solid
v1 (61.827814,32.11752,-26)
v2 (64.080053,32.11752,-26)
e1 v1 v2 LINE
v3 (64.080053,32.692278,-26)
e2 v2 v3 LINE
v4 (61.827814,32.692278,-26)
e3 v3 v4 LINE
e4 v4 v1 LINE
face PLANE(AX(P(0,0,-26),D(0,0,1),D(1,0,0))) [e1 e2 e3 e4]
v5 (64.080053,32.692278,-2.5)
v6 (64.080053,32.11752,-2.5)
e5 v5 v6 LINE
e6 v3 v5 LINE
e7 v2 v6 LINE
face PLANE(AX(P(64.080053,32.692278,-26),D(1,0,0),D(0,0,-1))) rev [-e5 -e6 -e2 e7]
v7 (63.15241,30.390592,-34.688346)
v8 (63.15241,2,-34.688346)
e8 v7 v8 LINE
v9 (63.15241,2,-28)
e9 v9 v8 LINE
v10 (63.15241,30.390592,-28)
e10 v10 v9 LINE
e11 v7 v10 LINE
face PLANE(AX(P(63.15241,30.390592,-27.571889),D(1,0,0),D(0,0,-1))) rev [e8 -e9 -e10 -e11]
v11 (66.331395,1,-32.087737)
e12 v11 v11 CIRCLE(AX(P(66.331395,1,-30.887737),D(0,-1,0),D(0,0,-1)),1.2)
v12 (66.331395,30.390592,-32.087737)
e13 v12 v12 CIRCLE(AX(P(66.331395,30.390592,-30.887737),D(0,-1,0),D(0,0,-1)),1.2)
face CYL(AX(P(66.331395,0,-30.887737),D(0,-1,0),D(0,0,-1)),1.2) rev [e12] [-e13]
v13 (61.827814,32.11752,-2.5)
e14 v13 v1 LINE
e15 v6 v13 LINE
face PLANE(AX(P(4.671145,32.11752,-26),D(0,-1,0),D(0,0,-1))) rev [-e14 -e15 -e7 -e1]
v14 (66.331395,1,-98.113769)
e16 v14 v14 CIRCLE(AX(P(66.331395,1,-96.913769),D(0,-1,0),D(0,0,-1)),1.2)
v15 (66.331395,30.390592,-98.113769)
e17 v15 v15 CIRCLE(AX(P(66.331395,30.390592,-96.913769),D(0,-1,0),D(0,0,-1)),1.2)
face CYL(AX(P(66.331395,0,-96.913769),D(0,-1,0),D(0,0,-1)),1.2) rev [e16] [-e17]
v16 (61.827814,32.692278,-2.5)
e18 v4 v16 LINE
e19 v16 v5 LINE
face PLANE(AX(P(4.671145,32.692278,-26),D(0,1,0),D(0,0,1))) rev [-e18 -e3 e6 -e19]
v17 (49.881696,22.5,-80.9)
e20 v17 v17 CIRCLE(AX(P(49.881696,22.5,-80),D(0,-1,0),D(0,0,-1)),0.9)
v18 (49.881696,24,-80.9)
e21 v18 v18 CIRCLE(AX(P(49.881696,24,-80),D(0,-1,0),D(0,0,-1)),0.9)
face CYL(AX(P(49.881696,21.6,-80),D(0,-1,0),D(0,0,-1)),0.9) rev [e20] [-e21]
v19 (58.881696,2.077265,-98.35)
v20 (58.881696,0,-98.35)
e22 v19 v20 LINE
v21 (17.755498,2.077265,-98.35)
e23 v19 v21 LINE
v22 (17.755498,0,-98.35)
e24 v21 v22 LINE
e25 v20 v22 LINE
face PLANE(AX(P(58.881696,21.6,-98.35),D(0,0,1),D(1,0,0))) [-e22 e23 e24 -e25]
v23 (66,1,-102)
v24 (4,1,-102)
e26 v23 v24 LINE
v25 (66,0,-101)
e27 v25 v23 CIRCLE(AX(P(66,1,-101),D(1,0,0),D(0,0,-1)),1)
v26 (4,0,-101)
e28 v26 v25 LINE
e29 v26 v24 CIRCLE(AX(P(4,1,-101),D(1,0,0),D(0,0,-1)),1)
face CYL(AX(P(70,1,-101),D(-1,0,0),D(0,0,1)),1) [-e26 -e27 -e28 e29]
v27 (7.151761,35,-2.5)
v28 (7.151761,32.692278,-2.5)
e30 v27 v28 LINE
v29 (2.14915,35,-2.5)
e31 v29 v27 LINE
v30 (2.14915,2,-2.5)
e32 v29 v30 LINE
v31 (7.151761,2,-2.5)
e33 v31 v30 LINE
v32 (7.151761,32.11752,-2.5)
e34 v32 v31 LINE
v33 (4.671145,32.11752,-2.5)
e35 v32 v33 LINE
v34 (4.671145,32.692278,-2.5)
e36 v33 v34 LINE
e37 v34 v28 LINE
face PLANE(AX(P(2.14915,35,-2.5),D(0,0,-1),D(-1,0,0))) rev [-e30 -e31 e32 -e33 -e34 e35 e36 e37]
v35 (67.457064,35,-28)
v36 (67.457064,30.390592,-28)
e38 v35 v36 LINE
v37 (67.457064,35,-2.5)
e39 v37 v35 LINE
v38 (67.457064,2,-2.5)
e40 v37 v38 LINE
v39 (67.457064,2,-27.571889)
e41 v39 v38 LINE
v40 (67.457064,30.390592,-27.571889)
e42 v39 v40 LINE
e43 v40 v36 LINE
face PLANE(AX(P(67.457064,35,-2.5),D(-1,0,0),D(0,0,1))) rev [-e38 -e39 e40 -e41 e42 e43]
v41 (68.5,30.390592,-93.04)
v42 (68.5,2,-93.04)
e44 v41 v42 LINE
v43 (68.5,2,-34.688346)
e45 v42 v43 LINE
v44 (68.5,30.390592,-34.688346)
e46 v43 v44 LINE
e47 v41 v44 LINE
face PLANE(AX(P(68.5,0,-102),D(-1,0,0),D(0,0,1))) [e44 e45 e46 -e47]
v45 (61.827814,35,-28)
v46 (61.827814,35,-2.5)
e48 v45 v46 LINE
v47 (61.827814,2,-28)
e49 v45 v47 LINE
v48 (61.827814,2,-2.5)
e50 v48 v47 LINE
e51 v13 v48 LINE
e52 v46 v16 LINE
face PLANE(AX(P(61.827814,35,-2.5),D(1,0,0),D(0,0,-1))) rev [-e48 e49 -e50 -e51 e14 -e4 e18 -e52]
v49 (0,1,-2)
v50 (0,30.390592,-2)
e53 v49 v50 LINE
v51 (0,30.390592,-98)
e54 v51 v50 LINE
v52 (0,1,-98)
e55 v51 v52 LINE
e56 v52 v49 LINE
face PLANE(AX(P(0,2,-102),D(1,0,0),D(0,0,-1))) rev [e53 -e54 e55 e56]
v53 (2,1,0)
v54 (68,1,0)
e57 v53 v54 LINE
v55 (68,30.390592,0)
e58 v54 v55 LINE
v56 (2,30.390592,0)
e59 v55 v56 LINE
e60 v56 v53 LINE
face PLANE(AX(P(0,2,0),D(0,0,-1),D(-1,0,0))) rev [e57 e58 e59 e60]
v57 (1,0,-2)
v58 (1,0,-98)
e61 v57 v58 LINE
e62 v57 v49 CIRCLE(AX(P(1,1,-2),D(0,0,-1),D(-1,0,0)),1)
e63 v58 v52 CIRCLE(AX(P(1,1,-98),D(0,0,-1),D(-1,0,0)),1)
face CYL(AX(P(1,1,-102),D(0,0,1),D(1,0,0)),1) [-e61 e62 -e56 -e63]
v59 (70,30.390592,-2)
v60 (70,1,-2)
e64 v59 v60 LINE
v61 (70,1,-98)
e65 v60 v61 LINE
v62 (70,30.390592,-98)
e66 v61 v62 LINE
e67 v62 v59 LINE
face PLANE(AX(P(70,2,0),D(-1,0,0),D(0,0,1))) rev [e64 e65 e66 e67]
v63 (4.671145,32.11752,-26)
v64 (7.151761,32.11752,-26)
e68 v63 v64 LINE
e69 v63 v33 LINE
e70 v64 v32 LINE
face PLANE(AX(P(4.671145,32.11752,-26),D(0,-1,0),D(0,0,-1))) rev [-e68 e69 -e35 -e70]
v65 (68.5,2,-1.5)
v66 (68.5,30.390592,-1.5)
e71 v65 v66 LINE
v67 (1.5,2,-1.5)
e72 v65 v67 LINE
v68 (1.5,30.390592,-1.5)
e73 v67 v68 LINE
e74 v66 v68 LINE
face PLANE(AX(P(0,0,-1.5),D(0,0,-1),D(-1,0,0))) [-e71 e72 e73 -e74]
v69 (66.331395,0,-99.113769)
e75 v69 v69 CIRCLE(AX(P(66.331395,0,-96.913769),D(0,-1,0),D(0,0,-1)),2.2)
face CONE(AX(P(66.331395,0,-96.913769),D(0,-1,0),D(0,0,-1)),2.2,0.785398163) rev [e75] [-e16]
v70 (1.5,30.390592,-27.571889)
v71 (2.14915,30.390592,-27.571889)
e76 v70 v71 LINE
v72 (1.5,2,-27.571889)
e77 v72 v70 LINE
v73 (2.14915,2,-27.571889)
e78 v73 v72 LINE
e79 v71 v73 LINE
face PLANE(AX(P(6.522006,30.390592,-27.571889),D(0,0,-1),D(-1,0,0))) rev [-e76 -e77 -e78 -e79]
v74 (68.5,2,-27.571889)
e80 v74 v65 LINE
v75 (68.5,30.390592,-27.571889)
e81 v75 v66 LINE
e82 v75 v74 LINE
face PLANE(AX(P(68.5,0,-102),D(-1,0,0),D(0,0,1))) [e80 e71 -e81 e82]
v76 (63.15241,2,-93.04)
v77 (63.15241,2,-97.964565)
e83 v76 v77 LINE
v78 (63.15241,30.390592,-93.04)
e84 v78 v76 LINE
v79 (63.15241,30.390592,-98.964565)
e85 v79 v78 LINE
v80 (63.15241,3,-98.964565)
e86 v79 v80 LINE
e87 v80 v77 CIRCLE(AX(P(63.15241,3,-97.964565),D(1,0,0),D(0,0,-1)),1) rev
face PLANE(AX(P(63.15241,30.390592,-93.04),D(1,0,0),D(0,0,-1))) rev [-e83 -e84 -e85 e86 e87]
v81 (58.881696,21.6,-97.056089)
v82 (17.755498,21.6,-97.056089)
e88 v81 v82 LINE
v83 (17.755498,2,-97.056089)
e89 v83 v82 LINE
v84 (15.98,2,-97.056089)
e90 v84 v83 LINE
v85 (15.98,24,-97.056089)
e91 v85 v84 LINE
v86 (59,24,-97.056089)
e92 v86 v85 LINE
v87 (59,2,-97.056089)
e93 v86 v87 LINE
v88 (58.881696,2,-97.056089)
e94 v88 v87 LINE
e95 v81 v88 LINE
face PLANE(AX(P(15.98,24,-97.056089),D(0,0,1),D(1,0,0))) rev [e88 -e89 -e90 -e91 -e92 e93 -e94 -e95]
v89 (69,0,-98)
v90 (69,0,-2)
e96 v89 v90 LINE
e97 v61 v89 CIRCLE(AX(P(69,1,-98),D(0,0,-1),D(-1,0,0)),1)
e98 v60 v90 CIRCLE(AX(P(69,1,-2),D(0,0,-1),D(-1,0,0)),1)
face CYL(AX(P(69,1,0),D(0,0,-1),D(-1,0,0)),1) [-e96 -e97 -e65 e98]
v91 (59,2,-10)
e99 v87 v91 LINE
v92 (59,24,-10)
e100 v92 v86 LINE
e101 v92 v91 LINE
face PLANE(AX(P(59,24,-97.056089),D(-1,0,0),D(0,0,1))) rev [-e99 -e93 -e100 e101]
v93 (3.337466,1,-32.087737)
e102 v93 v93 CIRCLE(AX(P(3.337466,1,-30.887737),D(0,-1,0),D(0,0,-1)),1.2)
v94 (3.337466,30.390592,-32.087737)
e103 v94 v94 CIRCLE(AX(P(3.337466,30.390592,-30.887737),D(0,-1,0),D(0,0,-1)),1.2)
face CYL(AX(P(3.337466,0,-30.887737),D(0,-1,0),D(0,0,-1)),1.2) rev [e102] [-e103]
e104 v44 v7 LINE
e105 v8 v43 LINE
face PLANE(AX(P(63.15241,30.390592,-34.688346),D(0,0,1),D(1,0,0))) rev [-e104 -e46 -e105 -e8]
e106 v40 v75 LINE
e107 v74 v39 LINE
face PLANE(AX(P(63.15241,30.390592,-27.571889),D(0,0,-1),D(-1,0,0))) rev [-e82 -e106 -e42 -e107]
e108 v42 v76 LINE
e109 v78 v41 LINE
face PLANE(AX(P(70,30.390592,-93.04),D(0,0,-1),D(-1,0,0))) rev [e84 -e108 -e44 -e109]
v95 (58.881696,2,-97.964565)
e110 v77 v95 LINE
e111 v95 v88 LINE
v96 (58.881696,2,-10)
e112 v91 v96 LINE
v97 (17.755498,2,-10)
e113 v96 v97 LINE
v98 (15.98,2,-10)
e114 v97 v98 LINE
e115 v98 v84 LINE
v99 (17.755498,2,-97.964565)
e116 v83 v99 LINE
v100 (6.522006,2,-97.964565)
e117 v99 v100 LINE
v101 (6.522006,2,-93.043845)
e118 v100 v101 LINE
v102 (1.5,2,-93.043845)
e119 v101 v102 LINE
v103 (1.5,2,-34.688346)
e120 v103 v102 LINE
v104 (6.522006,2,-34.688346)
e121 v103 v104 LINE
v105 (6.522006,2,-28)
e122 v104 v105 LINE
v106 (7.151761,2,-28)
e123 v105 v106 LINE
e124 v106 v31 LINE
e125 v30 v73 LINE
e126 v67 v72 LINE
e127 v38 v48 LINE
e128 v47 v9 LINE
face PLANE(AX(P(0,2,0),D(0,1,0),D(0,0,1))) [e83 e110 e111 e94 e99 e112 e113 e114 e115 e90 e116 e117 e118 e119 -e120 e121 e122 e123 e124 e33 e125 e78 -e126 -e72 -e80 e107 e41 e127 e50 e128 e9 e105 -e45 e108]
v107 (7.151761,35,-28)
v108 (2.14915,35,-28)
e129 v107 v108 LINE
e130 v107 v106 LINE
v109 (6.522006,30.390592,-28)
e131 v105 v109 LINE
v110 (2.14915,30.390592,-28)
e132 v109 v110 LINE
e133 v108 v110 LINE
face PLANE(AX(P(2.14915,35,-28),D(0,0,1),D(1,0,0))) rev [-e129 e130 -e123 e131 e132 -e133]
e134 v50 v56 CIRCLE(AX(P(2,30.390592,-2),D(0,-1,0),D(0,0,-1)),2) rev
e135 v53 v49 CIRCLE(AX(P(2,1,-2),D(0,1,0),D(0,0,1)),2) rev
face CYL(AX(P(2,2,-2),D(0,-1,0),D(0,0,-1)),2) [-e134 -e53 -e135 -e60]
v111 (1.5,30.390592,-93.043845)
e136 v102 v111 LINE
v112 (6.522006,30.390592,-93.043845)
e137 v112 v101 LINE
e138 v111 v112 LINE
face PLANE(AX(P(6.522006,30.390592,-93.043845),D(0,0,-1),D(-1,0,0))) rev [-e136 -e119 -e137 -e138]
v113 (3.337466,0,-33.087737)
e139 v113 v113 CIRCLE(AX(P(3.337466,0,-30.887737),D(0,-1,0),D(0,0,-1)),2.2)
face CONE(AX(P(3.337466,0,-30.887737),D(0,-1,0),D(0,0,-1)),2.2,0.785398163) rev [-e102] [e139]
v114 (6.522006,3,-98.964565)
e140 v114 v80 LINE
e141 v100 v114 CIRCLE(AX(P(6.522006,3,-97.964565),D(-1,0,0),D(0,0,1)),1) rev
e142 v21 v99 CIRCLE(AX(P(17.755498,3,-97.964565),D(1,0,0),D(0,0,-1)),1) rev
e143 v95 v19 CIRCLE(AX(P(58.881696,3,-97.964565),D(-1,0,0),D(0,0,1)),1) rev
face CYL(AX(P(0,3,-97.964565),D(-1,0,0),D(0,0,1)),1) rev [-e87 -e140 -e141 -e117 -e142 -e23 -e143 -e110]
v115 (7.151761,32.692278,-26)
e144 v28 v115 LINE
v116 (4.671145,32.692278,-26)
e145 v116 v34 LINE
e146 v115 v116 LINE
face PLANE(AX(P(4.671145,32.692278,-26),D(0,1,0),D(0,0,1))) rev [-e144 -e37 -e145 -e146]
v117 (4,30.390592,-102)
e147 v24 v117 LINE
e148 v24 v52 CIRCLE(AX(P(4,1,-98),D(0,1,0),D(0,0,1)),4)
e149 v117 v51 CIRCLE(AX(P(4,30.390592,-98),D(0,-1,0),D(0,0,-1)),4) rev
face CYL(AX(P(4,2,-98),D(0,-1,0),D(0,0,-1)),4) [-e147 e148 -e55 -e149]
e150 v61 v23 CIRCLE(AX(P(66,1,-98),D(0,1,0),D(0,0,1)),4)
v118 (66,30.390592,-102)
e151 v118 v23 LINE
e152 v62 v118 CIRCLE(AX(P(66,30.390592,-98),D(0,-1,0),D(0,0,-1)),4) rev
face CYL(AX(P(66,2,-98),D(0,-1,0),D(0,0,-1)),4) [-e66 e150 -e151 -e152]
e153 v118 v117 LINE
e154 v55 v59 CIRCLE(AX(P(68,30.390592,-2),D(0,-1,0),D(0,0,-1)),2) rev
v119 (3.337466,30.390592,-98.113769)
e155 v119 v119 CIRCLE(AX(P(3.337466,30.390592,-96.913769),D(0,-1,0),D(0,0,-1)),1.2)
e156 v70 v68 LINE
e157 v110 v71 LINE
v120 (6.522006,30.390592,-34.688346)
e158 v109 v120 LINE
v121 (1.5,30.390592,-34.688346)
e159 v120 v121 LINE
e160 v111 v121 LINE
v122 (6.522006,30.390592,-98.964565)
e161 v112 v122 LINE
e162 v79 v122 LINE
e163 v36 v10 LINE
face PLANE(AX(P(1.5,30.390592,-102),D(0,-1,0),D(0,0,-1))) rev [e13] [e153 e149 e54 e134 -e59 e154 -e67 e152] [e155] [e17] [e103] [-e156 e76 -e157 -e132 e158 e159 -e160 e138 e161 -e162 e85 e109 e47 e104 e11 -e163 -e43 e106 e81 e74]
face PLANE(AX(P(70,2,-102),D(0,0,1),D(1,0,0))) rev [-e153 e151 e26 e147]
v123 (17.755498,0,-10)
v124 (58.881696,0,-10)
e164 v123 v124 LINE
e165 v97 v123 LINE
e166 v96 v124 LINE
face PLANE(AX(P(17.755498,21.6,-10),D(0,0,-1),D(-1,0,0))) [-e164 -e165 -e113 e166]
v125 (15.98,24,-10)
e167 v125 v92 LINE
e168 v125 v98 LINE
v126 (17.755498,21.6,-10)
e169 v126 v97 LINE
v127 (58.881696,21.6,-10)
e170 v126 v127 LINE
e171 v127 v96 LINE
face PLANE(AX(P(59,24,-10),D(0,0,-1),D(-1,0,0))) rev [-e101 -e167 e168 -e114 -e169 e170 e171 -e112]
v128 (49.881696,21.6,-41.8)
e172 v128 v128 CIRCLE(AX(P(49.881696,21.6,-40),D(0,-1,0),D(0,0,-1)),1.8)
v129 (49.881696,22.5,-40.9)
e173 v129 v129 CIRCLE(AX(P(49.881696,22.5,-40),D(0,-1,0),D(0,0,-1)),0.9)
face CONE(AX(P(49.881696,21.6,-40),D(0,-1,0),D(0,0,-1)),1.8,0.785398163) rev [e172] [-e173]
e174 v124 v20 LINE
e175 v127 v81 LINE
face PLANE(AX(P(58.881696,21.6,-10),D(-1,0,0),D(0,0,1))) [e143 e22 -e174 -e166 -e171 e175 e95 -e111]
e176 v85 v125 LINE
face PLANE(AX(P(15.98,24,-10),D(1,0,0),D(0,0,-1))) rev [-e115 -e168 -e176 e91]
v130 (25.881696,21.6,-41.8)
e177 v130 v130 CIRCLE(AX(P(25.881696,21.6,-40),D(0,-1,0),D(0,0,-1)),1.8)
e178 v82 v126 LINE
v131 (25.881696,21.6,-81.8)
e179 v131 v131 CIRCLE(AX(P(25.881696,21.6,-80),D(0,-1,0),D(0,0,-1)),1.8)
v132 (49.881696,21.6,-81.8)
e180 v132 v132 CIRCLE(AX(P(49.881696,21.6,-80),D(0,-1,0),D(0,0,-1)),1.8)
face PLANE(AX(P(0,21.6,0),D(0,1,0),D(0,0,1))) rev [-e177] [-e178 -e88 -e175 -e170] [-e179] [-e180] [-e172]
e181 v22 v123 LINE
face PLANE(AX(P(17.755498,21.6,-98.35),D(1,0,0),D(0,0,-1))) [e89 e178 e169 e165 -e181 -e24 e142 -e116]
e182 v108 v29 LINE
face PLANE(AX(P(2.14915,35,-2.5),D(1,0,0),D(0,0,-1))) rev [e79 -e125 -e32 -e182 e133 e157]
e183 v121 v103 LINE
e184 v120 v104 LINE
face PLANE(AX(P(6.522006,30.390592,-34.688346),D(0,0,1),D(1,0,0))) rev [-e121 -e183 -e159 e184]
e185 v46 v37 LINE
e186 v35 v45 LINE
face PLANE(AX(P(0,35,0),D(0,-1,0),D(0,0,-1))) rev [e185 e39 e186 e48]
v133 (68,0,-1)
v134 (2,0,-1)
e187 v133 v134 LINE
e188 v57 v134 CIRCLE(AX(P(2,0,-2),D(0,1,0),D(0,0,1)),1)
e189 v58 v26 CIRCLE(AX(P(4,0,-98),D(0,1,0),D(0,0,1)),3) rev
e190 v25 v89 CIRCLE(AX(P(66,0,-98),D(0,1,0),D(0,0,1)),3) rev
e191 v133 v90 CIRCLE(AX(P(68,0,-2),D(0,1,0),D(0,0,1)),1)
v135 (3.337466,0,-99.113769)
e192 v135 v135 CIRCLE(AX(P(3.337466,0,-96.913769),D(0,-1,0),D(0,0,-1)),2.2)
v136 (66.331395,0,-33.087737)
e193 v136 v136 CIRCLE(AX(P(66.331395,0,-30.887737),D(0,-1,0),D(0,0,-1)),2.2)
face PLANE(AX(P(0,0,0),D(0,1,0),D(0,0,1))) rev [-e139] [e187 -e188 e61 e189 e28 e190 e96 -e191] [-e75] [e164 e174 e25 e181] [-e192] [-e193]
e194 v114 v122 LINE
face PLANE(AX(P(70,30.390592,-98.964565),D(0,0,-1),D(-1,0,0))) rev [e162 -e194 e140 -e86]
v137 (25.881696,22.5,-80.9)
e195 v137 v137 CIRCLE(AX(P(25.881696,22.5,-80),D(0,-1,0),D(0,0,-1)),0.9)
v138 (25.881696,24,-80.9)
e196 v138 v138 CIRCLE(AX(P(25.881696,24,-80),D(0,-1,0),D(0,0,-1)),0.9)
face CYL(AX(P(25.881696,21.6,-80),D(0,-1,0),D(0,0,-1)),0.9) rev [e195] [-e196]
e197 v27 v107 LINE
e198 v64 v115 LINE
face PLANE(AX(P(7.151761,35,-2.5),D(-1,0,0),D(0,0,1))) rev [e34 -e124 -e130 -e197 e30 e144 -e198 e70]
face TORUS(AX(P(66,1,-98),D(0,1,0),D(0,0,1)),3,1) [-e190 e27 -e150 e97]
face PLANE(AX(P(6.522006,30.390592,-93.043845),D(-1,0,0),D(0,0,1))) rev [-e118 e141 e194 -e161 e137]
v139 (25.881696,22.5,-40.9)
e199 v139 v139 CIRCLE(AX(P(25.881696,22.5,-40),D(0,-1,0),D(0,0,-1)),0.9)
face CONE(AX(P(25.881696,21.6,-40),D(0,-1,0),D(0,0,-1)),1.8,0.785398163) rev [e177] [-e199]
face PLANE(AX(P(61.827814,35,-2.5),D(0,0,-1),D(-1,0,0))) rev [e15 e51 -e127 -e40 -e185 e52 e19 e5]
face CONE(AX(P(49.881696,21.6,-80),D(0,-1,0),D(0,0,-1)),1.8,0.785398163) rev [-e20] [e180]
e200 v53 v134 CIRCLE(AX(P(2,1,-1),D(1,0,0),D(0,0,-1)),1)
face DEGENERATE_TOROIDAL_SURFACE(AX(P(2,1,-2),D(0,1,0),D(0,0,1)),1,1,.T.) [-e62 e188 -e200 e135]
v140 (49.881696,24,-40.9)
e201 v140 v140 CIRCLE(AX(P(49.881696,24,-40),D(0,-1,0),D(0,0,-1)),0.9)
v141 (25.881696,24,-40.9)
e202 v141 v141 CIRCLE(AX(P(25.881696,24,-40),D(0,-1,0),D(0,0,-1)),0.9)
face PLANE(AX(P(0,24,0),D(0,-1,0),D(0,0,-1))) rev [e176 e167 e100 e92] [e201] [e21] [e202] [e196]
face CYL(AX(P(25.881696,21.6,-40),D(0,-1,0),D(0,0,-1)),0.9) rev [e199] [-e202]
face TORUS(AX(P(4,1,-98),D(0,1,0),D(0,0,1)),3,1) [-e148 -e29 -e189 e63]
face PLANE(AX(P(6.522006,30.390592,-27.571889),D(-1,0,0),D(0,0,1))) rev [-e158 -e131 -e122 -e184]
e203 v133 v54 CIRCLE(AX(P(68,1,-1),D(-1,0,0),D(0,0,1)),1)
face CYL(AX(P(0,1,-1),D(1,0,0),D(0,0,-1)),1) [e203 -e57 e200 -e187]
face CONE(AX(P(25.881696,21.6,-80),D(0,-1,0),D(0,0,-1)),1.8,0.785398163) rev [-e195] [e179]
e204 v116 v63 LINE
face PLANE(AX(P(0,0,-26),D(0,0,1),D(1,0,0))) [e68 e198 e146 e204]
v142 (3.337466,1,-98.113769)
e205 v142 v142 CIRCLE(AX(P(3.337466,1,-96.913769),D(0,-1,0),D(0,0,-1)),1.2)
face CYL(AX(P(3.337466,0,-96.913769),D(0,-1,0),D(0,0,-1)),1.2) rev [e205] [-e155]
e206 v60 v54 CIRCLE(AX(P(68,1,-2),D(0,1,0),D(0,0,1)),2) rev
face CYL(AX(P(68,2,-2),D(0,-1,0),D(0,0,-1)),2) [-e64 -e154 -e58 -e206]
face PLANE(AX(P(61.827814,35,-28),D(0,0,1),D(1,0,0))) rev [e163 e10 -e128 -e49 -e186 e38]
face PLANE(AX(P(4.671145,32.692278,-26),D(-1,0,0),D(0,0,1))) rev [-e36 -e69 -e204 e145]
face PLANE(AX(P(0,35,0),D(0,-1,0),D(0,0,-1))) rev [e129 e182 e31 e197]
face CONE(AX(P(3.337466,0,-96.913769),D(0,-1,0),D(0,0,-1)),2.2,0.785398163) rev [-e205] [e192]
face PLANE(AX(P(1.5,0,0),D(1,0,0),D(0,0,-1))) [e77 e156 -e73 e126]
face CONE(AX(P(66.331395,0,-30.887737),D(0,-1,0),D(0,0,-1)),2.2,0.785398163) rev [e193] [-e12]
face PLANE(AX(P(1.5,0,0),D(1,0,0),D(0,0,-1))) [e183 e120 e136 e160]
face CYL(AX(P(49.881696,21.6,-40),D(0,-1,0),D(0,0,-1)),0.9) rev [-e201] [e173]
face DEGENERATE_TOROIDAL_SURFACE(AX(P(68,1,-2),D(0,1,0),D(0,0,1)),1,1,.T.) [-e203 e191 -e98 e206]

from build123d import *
from build123d.topology import SkipClean

# Parameters (mm, degrees)
SKETCH1_W                                            = 70
SKETCH1_H                                            = 102
BOSS_EXTRUDE1_DEPTH                                  = 2
SKETCH5_W                                            = 43.02
SKETCH5_H                                            = 87.056089095
BOSS_EXTRUDE3_DEPTH                                  = 24
SKETCH8_W                                            = 41.126198898
SKETCH8_H                                            = 88.35
CUT_EXTRUDE1_DEPTH                                   = 21.6
SKETCH9_W                                            = 102
SKETCH9_H                                            = 30.390592434
BOSS_EXTRUDE4_DEPTH                                  = 1.5
SKETCH10_W                                           = 3.035434725
SKETCH10_H                                           = 30.390592434
BOSS_EXTRUDE5_DEPTH                                  = 70
SKETCH12_W                                           = 70
SKETCH12_H                                           = 30.390592434
BOSS_EXTRUDE6_DEPTH                                  = 1.5
SKETCH13_W                                           = 1.5
SKETCH13_H                                           = 30.390592434
BOSS_EXTRUDE7_DEPTH                                  = 102
SKETCH14_W                                           = 5.822885906
SKETCH14_H                                           = 7.11645762
SKETCH14_W_2                                         = 6.522006055
SKETCH14_H_2                                         = 8.956155289
SKETCH14_W_3                                         = 6.847590119
SKETCH14_H_3                                         = 8.96
BOSS_EXTRUDE8_DEPTH                                  = 30.390592
CSK_FOR_M2_FLAT_HEAD_MACHINE_SCREW2_D                = 2.4
CSK_FOR_M2_FLAT_HEAD_MACHINE_SCREW2_CSINK_D          = 4.4
CSK_FOR_M2_FLAT_HEAD_MACHINE_SCREW2_CSINK_ANGLE      = 90
FILLET3_R                                            = 4
FILLET4_R                                            = 1
CSK_FOR_M1_6_CROSS_RECESS_FLAT_HEAD_SCRE_D           = 1.8
CSK_FOR_M1_6_CROSS_RECESS_FLAT_HEAD_SCRE_CSINK_D     = 3.6
CSK_FOR_M1_6_CROSS_RECESS_FLAT_HEAD_SCRE_CSINK_ANGLE = 90
SKETCH25_W                                           = 5.0026108
SKETCH25_H                                           = 25.5
SKETCH25_W_2                                         = 5.629250098
BOSS_EXTRUDE11_DEPTH                                 = 35
FILLET5_R                                            = 2
SKETCH43_W                                           = 59.408907714
SKETCH43_H                                           = 0.574758198
CUT_EXTRUDE6_DEPTH                                   = 26


with BuildPart() as part:
    # Sketch1 → Boss-Extrude1 (new body)
    with BuildSketch(Plane(origin=(0, 0, 0), x_dir=(1, 0, 0), z_dir=(0, 1, 0))):
        with Locations((35, 51)):
            Rectangle(SKETCH1_W, SKETCH1_H)
    extrude(amount=BOSS_EXTRUDE1_DEPTH)

    # Sketch5 → Boss-Extrude3 (add)
    with BuildSketch(Plane(origin=(0, 0, 0), x_dir=(1, 0, 0), z_dir=(0, 1, 0))):
        with Locations((37.49, 53.528044548)):
            Rectangle(SKETCH5_W, SKETCH5_H)
    extrude(amount=BOSS_EXTRUDE3_DEPTH)

    # Sketch8 → Cut-Extrude1 (cut)
    with BuildSketch(Plane(origin=(0, 0, 0), x_dir=(1, 0, 0), z_dir=(0, 1, 0))):
        with Locations((38.31859696, 54.175)):
            Rectangle(SKETCH8_W, SKETCH8_H)
    extrude(amount=CUT_EXTRUDE1_DEPTH, mode=Mode.SUBTRACT)

    # Sketch9 → Boss-Extrude4 (add)
    with BuildSketch(Plane(origin=(0, 0, 0), x_dir=(0, 0, -1), z_dir=(1, 0, 0))):
        with Locations((51, 15.195296217)):
            Rectangle(SKETCH9_W, SKETCH9_H)
    extrude(amount=BOSS_EXTRUDE4_DEPTH)

    # Sketch10 → Boss-Extrude5 (add)
    with BuildSketch(Plane(origin=(0, 0, 0), x_dir=(0, 0, -1), z_dir=(1, 0, 0))):
        with Locations((100.482282638, 15.195296217)):
            Rectangle(SKETCH10_W, SKETCH10_H)
    extrude(amount=BOSS_EXTRUDE5_DEPTH)

    # Sketch12 → Boss-Extrude6 (add)
    with BuildSketch(Plane.XY):
        with Locations((35, 15.195296217)):
            Rectangle(SKETCH12_W, SKETCH12_H)
    extrude(amount=-BOSS_EXTRUDE6_DEPTH)

    # Sketch13 → Boss-Extrude7 (add)
    with BuildSketch(Plane.XY):
        with Locations((69.25, 15.195296217)):
            Rectangle(SKETCH13_W, SKETCH13_H)
    extrude(amount=-BOSS_EXTRUDE7_DEPTH)

    # Sketch14 → Boss-Extrude8 (add, through all)
    with SkipClean():  # the faces are left unmerged after this step: merging them gives an invalid solid
        with BuildSketch(Plane(origin=(0, 0, 0), x_dir=(1, 0, 0), z_dir=(0, 1, 0))):
            with Locations((3.610563102, 31.130117345)):
                Rectangle(SKETCH14_W, SKETCH14_H)
            with Locations((3.261003028, 97.521922356)):
                Rectangle(SKETCH14_W_2, SKETCH14_H_2)
            with Locations((66.576204941, 97.52)):
                Rectangle(SKETCH14_W_3, SKETCH14_H_3)
            with Locations((66.576204941, 31.130117345)):
                Rectangle(SKETCH14_W_3, SKETCH14_H)
        extrude(amount=BOSS_EXTRUDE8_DEPTH)

    # CSK for M2 Flat Head Machine Screw2 (through all)
    with Locations(Plane(origin=(0, 0, 0), x_dir=(-1, 0, 0), z_dir=(0, -1, 0))):
        with Locations((-3.337466445, 96.913768876), (-66.331395266, 96.913768876), (-66.331395266, 30.887737285), (-3.337466445, 30.887737285)):
            CounterSinkHole(CSK_FOR_M2_FLAT_HEAD_MACHINE_SCREW2_D / 2, CSK_FOR_M2_FLAT_HEAD_MACHINE_SCREW2_CSINK_D / 2, counter_sink_angle=CSK_FOR_M2_FLAT_HEAD_MACHINE_SCREW2_CSINK_ANGLE)

    # Fillet3
    # the kernel refuses this fillet: 4 mm, written as the material it takes off along each edge
    with BuildSketch(Plane(origin=(0, 40.390592, -102), x_dir=(0, 0, 1), z_dir=(0, -1, 0))) as fillet3_piece_1_section:
        with BuildLine():
            CenterArc((FILLET3_R, -FILLET3_R), FILLET3_R, 90, 90)
            Line((0, -FILLET3_R), (-FILLET3_R * 0.02, -FILLET3_R))
            Line((-FILLET3_R * 0.02, -FILLET3_R), (-FILLET3_R * 0.02, FILLET3_R * 0.02))
            Line((-FILLET3_R * 0.02, FILLET3_R * 0.02), (FILLET3_R, FILLET3_R * 0.02))
            Line((FILLET3_R, FILLET3_R * 0.02), (FILLET3_R, 0))
        make_face()
    fillet3_piece_1 = extrude(amount=40.390592, mode=Mode.PRIVATE)
    fillet3_piece_1 = split(fillet3_piece_1, bisect_by=Plane(origin=(0.905580457, 30.390592434, -101.094419543), z_dir=(0, -1, 0)), keep=Keep.TOP, mode=Mode.PRIVATE)
    add(fillet3_piece_1, mode=Mode.SUBTRACT)
    with BuildSketch(Plane(origin=(70, 0, -102), x_dir=(0, 0, 1), z_dir=(0, 1, 0))) as fillet3_piece_2_section:
        with BuildLine():
            CenterArc((FILLET3_R, -FILLET3_R), FILLET3_R, 90, 90)
            Line((0, -FILLET3_R), (-FILLET3_R * 0.02, -FILLET3_R))
            Line((-FILLET3_R * 0.02, -FILLET3_R), (-FILLET3_R * 0.02, FILLET3_R * 0.02))
            Line((-FILLET3_R * 0.02, FILLET3_R * 0.02), (FILLET3_R, FILLET3_R * 0.02))
            Line((FILLET3_R, FILLET3_R * 0.02), (FILLET3_R, 0))
        make_face()
    fillet3_piece_2 = extrude(amount=40.390592, mode=Mode.PRIVATE)
    fillet3_piece_2 = split(fillet3_piece_2, bisect_by=Plane(origin=(69.094419543, 30.390592434, -101.094419543), z_dir=(0, -1, 0)), keep=Keep.TOP, mode=Mode.PRIVATE)
    add(fillet3_piece_2, mode=Mode.SUBTRACT)

    # Fillet4
    # the kernel refuses this fillet: 1 mm, written as the material it adds along each edge
    with BuildSketch(Plane(origin=(65.652409881, 2, -98.964565275), x_dir=(0, 1, 0), z_dir=(-1, 0, 0))) as fillet4_piece_1_section:
        with BuildLine():
            CenterArc((FILLET4_R, -FILLET4_R), FILLET4_R, 90, 90)
            Line((0, -FILLET4_R), (0, 0))
            Line((0, 0), (FILLET4_R, 0))
        make_face()
    fillet4_piece_1 = extrude(amount=61.630403826, mode=Mode.PRIVATE)
    fillet4_piece_1 = split(fillet4_piece_1, bisect_by=Plane(origin=(61.017053145, 2.232922343, -98.35), z_dir=(0, 0, -1)), keep=Keep.TOP, mode=Mode.PRIVATE)
    add(fillet4_piece_1)
    with BuildSketch(Plane(origin=(65.652409881, 2, -98.964565275), x_dir=(0, 1, 0), z_dir=(-1, 0, 0))) as fillet4_piece_2_section:
        with BuildLine():
            CenterArc((FILLET4_R, -FILLET4_R), FILLET4_R, 90, 90)
            Line((0, -FILLET4_R), (0, 0))
            Line((0, 0), (FILLET4_R, 0))
        make_face()
    fillet4_piece_2 = extrude(amount=61.630403826, mode=Mode.PRIVATE)
    fillet4_piece_2 = split(fillet4_piece_2, bisect_by=Plane(origin=(58.881696409, 2.02301744, -98.254401579), z_dir=(1, 0, 0)), keep=Keep.TOP, mode=Mode.PRIVATE)
    add(fillet4_piece_2)
    with BuildSketch(Plane(origin=(65.652409881, 2, -98.964565275), x_dir=(0, 1, 0), z_dir=(-1, 0, 0))) as fillet4_piece_3_section:
        with BuildLine():
            CenterArc((FILLET4_R, -FILLET4_R), FILLET4_R, 90, 90)
            Line((0, -FILLET4_R), (0, 0))
            Line((0, 0), (FILLET4_R, 0))
        make_face()
    fillet4_piece_3 = extrude(amount=61.630403826, mode=Mode.PRIVATE)
    fillet4_piece_3 = split(fillet4_piece_3, bisect_by=Plane(origin=(17.755497511, 2.02301744, -98.254401579), z_dir=(-1, 0, 0)), keep=Keep.TOP, mode=Mode.PRIVATE)
    add(fillet4_piece_3)
    # the kernel refuses this fillet: 1 mm, written as the material it takes off along each edge
    with BuildSketch(Plane(origin=(4, 0, -98), x_dir=(-1, 0, 0), z_dir=(0, 0, 1))) as fillet4_2_piece_1:
        with BuildLine():
            CenterArc((4 - FILLET4_R, -FILLET4_R), FILLET4_R, 0, 90)
            Line((4, -FILLET4_R), (4, 0))
            Line((4, 0), (4 - FILLET4_R, 0))
        make_face()
    revolve(axis=Axis((4, 0, -98), (0, -1, 0)), revolution_arc=90, mode=Mode.SUBTRACT)
    with BuildSketch(Plane(origin=(6.522006055, 0, -102), x_dir=(0, 0, 1), z_dir=(1, 0, 0))) as fillet4_2_piece_2:
        with BuildLine():
            CenterArc((FILLET4_R, -FILLET4_R), FILLET4_R, 90, 90)
            Line((0, -FILLET4_R), (0, 0))
            Line((0, 0), (FILLET4_R, 0))
        make_face()
    extrude(amount=56.630403826, mode=Mode.SUBTRACT)
    with BuildSketch(Plane(origin=(66, 0, -98), x_dir=(1, 0, 0), z_dir=(0, 0, 1))) as fillet4_2_piece_3:
        with BuildLine():
            CenterArc((4 - FILLET4_R, FILLET4_R), FILLET4_R, 270, 90)
            Line((4, FILLET4_R), (4, 0))
            Line((4, 0), (4 - FILLET4_R, 0))
        make_face()
    revolve(axis=Axis((66, 0, -98), (0, 1, 0)), revolution_arc=90, mode=Mode.SUBTRACT)
    with BuildSketch(Plane(origin=(70, 0, -93.04), x_dir=(-1, 0, 0), z_dir=(0, 0, 1))) as fillet4_2_piece_4:
        with BuildLine():
            CenterArc((FILLET4_R, -FILLET4_R), FILLET4_R, 90, 90)
            Line((0, -FILLET4_R), (0, 0))
            Line((0, 0), (FILLET4_R, 0))
        make_face()
    extrude(amount=58.351653845, mode=Mode.SUBTRACT)
    with BuildSketch(Plane(origin=(0, 0, 2.5), x_dir=(1, 0, 0), z_dir=(0, 0, -1))) as fillet4_2_piece_5:
        with BuildLine():
            CenterArc((FILLET4_R, -FILLET4_R), FILLET4_R, 90, 90)
            Line((0, -FILLET4_R), (0, 0))
            Line((0, 0), (FILLET4_R, 0))
        make_face()
    extrude(amount=95.543844711, mode=Mode.SUBTRACT)
    with BuildSketch(Plane(origin=(-2.5, 0, 0), x_dir=(0, 1, 0), z_dir=(1, 0, 0))) as fillet4_2_piece_6:
        with BuildLine():
            CenterArc((FILLET4_R, -FILLET4_R), FILLET4_R, 90, 90)
            Line((0, -FILLET4_R), (0, 0))
            Line((0, 0), (FILLET4_R, 0))
        make_face()
    extrude(amount=75, mode=Mode.SUBTRACT)
    with BuildSketch(Plane(origin=(0, 0, -93.043844711), x_dir=(1, 0, 0), z_dir=(0, 0, -1))) as fillet4_2_piece_7:
        with BuildLine():
            CenterArc((FILLET4_R, -FILLET4_R), FILLET4_R, 90, 90)
            Line((0, -FILLET4_R), (0, 0))
            Line((0, 0), (FILLET4_R, 0))
        make_face()
    extrude(amount=4.956155289, mode=Mode.SUBTRACT)
    with BuildSketch(Plane(origin=(70, 0, -98), x_dir=(-1, 0, 0), z_dir=(0, 0, 1))) as fillet4_2_piece_8:
        with BuildLine():
            CenterArc((FILLET4_R, -FILLET4_R), FILLET4_R, 90, 90)
            Line((0, -FILLET4_R), (0, 0))
            Line((0, 0), (FILLET4_R, 0))
        make_face()
    extrude(amount=4.96, mode=Mode.SUBTRACT)
    with BuildSketch(Plane(origin=(70, 0, -27.571888535), x_dir=(-1, 0, 0), z_dir=(0, 0, -1))) as fillet4_2_piece_9:
        with BuildLine():
            CenterArc((FILLET4_R, FILLET4_R), FILLET4_R, 180, 90)
            Line((0, FILLET4_R), (0, 0))
            Line((0, 0), (FILLET4_R, 0))
        make_face()
    extrude(amount=7.11645762, mode=Mode.SUBTRACT)
    with BuildSketch(Plane(origin=(70, 0, -27.571888535), x_dir=(-1, 0, 0), z_dir=(0, 0, 1))) as fillet4_2_piece_10:
        with BuildLine():
            CenterArc((FILLET4_R, -FILLET4_R), FILLET4_R, 90, 90)
            Line((0, -FILLET4_R), (0, 0))
            Line((0, 0), (FILLET4_R, 0))
        make_face()
    extrude(amount=30.071888535, mode=Mode.SUBTRACT)
    with BuildSketch(Plane(origin=(63.152409881, 0, -102), x_dir=(0, 0, 1), z_dir=(1, 0, 0))) as fillet4_2_piece_11:
        with BuildLine():
            CenterArc((FILLET4_R, -FILLET4_R), FILLET4_R, 90, 90)
            Line((0, -FILLET4_R), (0, 0))
            Line((0, 0), (FILLET4_R, 0))
        make_face()
    extrude(amount=2.847590119, mode=Mode.SUBTRACT)
    with BuildSketch(Plane(origin=(4, 0, -102), x_dir=(0, 0, 1), z_dir=(1, 0, 0))) as fillet4_2_piece_12:
        with BuildLine():
            CenterArc((FILLET4_R, -FILLET4_R), FILLET4_R, 90, 90)
            Line((0, -FILLET4_R), (0, 0))
            Line((0, 0), (FILLET4_R, 0))
        make_face()
    extrude(amount=2.522006055, mode=Mode.SUBTRACT)

    # CSK for M1.6 Cross Recess Flat Head Screw1 (through all)
    with Locations(Plane(origin=(0, 21.6, 0), x_dir=(-1, 0, 0), z_dir=(0, -1, 0))):
        with Locations((-25.881696409, 40), (-49.881696409, 40), (-25.881696409, 80), (-49.881696409, 80)):
            CounterSinkHole(CSK_FOR_M1_6_CROSS_RECESS_FLAT_HEAD_SCRE_D / 2, CSK_FOR_M1_6_CROSS_RECESS_FLAT_HEAD_SCRE_CSINK_D / 2, counter_sink_angle=CSK_FOR_M1_6_CROSS_RECESS_FLAT_HEAD_SCRE_CSINK_ANGLE)

    # Sketch25 → Boss-Extrude11 (add)
    with SkipClean():  # the faces are left unmerged after this step: merging them gives an invalid solid
        with BuildSketch(Plane(origin=(0, 0, 0), x_dir=(1, 0, 0), z_dir=(0, 1, 0))):
            with Locations((4.650455707, 15.25)):
                Rectangle(SKETCH25_W, SKETCH25_H)
            with Locations((64.64243864, 15.25)):
                Rectangle(SKETCH25_W_2, SKETCH25_H)
        extrude(amount=BOSS_EXTRUDE11_DEPTH)

    # Fillet5
    # the kernel refuses this fillet: 2 mm, written as the material it takes off along each edge
    with BuildSketch(Plane(origin=(2, 0, -2), x_dir=(0, 0, 1), z_dir=(1, 0, 0))) as fillet5_piece_1:
        with BuildLine():
            CenterArc((1, -1), 1, 0, 90)
            Line((2, -1), (2, 0))
            Line((2, 0), (1, 0))
        make_face()
    revolve(axis=Axis((2, 0, -2), (0, -1, 0)), revolution_arc=90, mode=Mode.SUBTRACT)
    with BuildSketch(Plane(origin=(68, 0, -2), x_dir=(1, 0, 0), z_dir=(0, 0, -1))) as fillet5_piece_2:
        with BuildLine():
            CenterArc((1, -1), 1, 0, 90)
            Line((2, -1), (2, 0))
            Line((2, 0), (1, 0))
        make_face()
    revolve(axis=Axis((68, 0, -2), (0, -1, 0)), revolution_arc=90, mode=Mode.SUBTRACT)
    with BuildSketch(Plane(origin=(70, 0, 0), x_dir=(0, 0, -1), z_dir=(0, 1, 0)), Plane(origin=(0, 35.390592434, 0), x_dir=(0, 0, -1), z_dir=(0, -1, 0))) as fillet5_piece_3:
        with BuildLine():
            CenterArc((FILLET5_R, FILLET5_R), FILLET5_R, 180, 90)
            Line((0, FILLET5_R), (0, 0))
            Line((0, 0), (FILLET5_R, 0))
        make_face()
    extrude(amount=35.390592434, mode=Mode.SUBTRACT)

    # Sketch43 → Cut-Extrude6 (cut)
    with SkipClean():  # the faces are left unmerged after this step: merging them gives an invalid solid
        with BuildSketch(Plane.XY):
            with Locations((34.375598891, 32.404898628)):
                Rectangle(SKETCH43_W, SKETCH43_H)
        extrude(amount=-CUT_EXTRUDE6_DEPTH, mode=Mode.SUBTRACT)


solid = part.part
